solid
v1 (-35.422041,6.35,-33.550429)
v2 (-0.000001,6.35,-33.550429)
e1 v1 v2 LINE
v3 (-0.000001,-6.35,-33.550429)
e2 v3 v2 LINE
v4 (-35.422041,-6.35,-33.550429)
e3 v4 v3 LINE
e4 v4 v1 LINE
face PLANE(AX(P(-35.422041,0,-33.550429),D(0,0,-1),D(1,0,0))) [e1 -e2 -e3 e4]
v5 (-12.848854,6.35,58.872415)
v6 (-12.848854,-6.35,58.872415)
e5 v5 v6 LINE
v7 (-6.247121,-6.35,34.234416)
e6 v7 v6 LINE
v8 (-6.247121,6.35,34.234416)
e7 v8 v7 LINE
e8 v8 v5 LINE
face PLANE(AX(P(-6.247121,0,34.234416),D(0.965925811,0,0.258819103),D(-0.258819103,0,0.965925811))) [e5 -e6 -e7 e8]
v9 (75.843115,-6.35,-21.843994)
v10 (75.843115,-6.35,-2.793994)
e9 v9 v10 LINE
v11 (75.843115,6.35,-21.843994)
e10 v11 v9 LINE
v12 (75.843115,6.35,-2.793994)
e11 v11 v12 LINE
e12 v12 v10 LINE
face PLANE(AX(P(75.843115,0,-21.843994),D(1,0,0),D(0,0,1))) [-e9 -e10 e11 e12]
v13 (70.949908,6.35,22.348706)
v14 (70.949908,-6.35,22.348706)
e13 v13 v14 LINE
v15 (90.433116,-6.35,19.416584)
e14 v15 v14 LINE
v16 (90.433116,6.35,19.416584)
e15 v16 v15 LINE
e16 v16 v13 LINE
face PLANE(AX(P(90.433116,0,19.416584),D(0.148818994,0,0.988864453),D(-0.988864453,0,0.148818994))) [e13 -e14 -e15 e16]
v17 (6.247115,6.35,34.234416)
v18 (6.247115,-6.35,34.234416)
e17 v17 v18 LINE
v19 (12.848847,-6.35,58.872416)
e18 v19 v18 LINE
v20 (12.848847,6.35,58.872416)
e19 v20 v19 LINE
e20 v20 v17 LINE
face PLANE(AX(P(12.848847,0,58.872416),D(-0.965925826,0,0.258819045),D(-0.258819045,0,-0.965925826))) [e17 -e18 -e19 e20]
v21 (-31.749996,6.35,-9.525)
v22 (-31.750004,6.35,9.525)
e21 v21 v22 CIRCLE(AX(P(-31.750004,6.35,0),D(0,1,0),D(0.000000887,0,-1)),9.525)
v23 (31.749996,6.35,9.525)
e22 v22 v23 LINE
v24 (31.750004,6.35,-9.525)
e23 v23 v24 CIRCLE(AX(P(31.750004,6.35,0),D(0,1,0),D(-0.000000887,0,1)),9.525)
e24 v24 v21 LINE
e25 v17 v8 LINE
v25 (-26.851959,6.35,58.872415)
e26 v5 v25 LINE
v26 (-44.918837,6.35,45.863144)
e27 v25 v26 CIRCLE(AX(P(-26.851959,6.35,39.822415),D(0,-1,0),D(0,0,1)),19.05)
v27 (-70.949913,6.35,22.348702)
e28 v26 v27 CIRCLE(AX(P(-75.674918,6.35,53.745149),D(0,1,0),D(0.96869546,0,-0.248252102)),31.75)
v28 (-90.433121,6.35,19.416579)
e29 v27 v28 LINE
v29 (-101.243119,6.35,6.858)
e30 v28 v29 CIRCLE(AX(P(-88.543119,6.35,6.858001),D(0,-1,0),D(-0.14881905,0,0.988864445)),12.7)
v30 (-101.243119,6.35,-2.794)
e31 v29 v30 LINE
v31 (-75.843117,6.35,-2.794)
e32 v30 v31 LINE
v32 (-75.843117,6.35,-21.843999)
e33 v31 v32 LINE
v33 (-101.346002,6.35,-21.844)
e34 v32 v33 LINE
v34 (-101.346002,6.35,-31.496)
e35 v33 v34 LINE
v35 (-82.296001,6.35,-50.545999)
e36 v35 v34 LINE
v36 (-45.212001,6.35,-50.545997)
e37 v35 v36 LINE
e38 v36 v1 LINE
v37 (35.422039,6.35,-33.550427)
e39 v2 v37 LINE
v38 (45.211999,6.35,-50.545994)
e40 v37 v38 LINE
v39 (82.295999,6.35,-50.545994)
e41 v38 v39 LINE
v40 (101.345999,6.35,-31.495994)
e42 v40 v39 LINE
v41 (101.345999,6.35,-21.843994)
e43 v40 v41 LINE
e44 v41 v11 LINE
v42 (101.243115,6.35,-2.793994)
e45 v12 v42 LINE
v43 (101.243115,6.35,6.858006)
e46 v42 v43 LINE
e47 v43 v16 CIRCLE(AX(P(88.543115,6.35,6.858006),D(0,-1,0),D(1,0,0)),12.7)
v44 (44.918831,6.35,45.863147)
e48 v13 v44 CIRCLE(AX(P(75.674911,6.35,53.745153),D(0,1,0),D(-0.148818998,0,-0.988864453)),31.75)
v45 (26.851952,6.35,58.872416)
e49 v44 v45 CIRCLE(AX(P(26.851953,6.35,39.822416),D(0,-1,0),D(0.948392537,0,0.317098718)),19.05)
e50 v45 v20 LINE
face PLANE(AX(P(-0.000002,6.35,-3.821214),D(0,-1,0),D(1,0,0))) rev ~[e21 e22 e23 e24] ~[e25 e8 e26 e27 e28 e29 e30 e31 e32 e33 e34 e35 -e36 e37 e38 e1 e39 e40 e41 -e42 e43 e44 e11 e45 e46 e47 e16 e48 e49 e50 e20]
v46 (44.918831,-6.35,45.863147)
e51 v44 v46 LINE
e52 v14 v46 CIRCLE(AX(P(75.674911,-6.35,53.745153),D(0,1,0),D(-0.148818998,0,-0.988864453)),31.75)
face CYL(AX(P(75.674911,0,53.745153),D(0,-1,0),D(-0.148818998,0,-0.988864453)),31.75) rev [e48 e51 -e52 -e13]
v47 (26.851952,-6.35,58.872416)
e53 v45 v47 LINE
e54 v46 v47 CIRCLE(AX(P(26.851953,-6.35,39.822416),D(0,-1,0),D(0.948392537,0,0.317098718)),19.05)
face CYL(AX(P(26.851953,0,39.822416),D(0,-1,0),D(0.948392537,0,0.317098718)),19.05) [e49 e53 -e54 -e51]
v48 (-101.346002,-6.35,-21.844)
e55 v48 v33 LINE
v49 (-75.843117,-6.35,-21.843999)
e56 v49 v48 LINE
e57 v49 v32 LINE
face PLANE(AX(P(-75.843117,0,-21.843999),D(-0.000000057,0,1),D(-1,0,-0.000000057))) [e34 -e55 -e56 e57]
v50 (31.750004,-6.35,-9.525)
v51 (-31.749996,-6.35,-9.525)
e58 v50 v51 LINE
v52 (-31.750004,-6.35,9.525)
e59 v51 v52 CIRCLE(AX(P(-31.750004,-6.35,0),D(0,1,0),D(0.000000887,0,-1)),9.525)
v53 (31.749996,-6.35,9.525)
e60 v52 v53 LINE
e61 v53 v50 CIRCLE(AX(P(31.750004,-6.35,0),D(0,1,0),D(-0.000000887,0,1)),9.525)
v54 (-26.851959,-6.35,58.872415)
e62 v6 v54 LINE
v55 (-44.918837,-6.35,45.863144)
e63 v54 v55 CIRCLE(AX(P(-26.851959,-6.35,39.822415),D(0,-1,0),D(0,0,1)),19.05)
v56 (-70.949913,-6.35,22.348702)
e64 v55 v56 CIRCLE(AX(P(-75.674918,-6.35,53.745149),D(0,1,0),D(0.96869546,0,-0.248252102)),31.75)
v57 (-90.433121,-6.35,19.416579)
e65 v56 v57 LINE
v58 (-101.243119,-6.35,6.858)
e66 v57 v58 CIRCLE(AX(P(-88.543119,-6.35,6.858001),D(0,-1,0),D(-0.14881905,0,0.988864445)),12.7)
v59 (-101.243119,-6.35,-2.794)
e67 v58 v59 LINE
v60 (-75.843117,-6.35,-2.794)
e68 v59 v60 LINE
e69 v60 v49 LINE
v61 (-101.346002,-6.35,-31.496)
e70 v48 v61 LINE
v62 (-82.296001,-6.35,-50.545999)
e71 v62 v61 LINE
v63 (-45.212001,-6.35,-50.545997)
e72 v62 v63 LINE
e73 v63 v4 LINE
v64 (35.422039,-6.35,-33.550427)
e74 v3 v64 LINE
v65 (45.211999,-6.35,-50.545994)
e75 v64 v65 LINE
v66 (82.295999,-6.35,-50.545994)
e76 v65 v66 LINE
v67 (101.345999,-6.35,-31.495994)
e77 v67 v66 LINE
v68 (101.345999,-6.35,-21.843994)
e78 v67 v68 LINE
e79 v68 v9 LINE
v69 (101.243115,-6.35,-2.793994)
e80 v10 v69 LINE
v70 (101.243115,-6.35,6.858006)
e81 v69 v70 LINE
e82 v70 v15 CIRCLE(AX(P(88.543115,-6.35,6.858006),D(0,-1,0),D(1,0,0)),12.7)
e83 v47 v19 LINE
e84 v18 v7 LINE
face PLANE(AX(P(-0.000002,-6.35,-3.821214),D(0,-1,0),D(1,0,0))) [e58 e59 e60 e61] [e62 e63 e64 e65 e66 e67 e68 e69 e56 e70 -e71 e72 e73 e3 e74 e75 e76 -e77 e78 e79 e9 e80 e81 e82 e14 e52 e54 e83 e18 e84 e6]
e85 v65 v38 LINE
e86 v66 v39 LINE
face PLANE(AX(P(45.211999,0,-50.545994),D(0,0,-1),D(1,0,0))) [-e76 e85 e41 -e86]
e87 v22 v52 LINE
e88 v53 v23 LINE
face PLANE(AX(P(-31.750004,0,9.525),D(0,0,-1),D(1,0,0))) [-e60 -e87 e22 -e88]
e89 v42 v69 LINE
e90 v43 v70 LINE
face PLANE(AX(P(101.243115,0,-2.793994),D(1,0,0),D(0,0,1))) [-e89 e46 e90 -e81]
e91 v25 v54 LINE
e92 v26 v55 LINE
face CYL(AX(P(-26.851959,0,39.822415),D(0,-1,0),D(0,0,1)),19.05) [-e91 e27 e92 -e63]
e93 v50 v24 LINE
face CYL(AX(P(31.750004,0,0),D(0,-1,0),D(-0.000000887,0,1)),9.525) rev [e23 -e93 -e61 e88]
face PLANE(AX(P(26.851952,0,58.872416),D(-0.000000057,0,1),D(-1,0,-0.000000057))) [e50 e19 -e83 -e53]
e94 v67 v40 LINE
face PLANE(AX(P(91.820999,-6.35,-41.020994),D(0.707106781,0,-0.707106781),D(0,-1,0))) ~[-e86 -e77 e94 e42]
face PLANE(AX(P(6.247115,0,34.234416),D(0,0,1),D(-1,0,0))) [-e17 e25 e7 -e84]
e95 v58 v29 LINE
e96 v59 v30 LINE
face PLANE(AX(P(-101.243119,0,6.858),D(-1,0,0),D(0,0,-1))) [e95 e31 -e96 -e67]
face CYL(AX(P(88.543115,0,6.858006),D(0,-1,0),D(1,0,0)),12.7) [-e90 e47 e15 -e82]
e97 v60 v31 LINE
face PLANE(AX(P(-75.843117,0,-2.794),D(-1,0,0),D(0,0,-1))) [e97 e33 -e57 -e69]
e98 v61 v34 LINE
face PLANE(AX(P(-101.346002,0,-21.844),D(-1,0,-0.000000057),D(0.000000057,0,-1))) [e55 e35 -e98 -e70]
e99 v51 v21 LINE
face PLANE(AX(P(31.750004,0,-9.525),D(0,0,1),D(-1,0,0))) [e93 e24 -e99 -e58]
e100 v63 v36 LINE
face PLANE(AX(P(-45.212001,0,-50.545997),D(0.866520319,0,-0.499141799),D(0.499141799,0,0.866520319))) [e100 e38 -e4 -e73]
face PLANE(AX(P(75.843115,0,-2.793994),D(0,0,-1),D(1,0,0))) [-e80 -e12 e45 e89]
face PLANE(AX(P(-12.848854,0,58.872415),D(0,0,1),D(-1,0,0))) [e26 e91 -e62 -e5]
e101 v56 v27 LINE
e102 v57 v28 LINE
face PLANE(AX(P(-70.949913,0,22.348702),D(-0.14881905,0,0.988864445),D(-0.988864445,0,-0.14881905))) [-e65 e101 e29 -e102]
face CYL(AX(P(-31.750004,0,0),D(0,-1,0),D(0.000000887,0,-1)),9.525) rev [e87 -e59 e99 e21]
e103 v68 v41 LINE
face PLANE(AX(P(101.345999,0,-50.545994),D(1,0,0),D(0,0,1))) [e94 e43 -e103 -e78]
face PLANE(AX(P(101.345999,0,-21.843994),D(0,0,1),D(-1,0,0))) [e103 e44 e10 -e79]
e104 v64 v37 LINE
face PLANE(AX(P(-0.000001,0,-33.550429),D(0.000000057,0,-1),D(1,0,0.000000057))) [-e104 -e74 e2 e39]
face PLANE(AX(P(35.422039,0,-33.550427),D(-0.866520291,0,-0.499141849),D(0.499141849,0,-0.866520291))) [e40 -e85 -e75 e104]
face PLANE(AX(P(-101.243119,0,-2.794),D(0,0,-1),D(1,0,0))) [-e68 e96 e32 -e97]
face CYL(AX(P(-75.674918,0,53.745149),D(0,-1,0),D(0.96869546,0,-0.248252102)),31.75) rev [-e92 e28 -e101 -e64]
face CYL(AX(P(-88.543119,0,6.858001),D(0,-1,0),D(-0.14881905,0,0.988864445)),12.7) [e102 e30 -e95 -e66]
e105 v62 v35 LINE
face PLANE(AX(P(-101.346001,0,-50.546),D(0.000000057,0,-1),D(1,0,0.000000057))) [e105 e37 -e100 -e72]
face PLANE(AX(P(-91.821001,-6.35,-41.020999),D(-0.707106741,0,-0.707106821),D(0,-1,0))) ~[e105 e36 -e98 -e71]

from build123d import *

# Parameters (mm, degrees)
F1_DEPTH = 6.35
F2_SIZE2 = 19.05
F2_SIZE  = 19.05
F3_SIZE2 = 19.05
F3_SIZE  = 19.05


# Not quite as in the source:
# - ends of sketch curves that miss each other by under 0.0002 mm in the source are joined


with BuildPart() as f1:
    # F0 (on Front) → F1 (new body, symmetric)
    with BuildSketch(Plane.XZ):
        with BuildLine():
            Line((101.3459994669, -21.8439942511), (75.8431146328, -21.8439942511))
            Line((75.8431146328, -21.8439942511), (75.8431146328, -2.7939942511))
            Line((75.8431146328, -2.7939942511), (101.2431146328, -2.7939942511))
            Line((101.2431146328, -2.7939942511), (101.2431146328, 6.8580057489))
            ThreePointArc((101.2431146328, 6.8580057489), (98.1684202272, 15.1431425742), (90.4331158589, 19.4165843056))
            Line((90.4331158589, 19.4165843056), (70.9499079155, 22.3487064989))
            ThreePointArc((70.9499079155, 22.3487064989), (54.3920764202, 30.184519391), (44.9188305794, 45.8631469058))
            ThreePointArc((44.9188305794, 45.8631469058), (37.9835870307, 55.281692466), (26.8519516779, 58.8724163371))
            Line((26.8519516779, 58.8724163371), (12.8488468359, 58.8724155428))
            Line((12.8488468359, 58.8724155428), (6.2471146328, 34.2344155428))
            Line((6.2471146328, 34.2344155428), (-6.2471205082, 34.2344155428))
            Line((-6.2471205082, 34.2344155428), (-12.848854109, 58.8724148139))
            Line((-12.848854109, 58.8724148139), (-26.8519589509, 58.8724148139))
            ThreePointArc((-26.8519589509, 58.8724148139), (-37.9835941001, 55.2816903113), (-44.9188371145, 45.8631443577))
            ThreePointArc((-44.9188371145, 45.8631443577), (-54.3920820431, 30.1845162803), (-70.9499131167, 22.3487024742))
            Line((-70.9499131167, 22.3487024742), (-90.4331208938, 19.4165791758))
            ThreePointArc((-90.4331208938, 19.4165791758), (-98.1684250197, 15.1431370056), (-101.2431189553, 6.8580000058))
            Line((-101.2431189553, 6.8580000058), (-101.2431189553, -2.7939999942))
            Line((-101.2431189553, -2.7939999942), (-75.8431173272, -2.7939999942))
            Line((-75.8431173272, -2.7939999942), (-75.8431173272, -21.8439985533))
            Line((-75.8431173272, -21.8439985533), (-101.3460021612, -21.844))
            Line((-101.3460021612, -21.844), (-101.3460005331, -50.546))
            Line((-101.3460005331, -50.546), (-45.2120005331, -50.5459968158))
            Line((-45.2120005331, -50.5459968158), (-35.4220414842, -33.5504287171))
            Line((-35.4220414842, -33.5504287171), (-1.0151e-06, -33.5504287171))
            Line((-1.0151e-06, -33.5504287171), (35.4220394539, -33.5504267077))
            Line((35.4220394539, -33.5504267077), (45.2119994669, -50.5459942511))
            Line((45.2119994669, -50.5459942511), (101.3459994669, -50.5459942511))
            Line((101.3459994669, -50.5459942511), (101.3459994669, -21.8439942511))
        make_face()
        with BuildLine():
            Line((-31.7500042241, 9.525), (31.7499957759, 9.525))
            ThreePointArc((31.7499957759, 9.525), (41.2750042241, 4.2241e-06), (31.7500042241, -9.525))
            Line((31.7500042241, -9.525), (-31.7499957759, -9.525))
            ThreePointArc((-31.7499957759, -9.525), (-41.2750042241, -4.2241e-06), (-31.7500042241, 9.525))
        make_face(mode=Mode.SUBTRACT)
    extrude(amount=F1_DEPTH, both=True)

    # F2
    f2_edges = [f1.edges().sort_by_distance(p)[0] for p in [
        (101.345999, 0, -50.545994),
    ]]
    chamfer(f2_edges, length=F2_SIZE, length2=F2_SIZE2)

    # F3
    f3_edges = [f1.edges().sort_by_distance(p)[0] for p in [
        (-101.346001, 0, -50.546),
    ]]
    chamfer(f3_edges, length=F3_SIZE, length2=F3_SIZE2)


solid = f1.part
